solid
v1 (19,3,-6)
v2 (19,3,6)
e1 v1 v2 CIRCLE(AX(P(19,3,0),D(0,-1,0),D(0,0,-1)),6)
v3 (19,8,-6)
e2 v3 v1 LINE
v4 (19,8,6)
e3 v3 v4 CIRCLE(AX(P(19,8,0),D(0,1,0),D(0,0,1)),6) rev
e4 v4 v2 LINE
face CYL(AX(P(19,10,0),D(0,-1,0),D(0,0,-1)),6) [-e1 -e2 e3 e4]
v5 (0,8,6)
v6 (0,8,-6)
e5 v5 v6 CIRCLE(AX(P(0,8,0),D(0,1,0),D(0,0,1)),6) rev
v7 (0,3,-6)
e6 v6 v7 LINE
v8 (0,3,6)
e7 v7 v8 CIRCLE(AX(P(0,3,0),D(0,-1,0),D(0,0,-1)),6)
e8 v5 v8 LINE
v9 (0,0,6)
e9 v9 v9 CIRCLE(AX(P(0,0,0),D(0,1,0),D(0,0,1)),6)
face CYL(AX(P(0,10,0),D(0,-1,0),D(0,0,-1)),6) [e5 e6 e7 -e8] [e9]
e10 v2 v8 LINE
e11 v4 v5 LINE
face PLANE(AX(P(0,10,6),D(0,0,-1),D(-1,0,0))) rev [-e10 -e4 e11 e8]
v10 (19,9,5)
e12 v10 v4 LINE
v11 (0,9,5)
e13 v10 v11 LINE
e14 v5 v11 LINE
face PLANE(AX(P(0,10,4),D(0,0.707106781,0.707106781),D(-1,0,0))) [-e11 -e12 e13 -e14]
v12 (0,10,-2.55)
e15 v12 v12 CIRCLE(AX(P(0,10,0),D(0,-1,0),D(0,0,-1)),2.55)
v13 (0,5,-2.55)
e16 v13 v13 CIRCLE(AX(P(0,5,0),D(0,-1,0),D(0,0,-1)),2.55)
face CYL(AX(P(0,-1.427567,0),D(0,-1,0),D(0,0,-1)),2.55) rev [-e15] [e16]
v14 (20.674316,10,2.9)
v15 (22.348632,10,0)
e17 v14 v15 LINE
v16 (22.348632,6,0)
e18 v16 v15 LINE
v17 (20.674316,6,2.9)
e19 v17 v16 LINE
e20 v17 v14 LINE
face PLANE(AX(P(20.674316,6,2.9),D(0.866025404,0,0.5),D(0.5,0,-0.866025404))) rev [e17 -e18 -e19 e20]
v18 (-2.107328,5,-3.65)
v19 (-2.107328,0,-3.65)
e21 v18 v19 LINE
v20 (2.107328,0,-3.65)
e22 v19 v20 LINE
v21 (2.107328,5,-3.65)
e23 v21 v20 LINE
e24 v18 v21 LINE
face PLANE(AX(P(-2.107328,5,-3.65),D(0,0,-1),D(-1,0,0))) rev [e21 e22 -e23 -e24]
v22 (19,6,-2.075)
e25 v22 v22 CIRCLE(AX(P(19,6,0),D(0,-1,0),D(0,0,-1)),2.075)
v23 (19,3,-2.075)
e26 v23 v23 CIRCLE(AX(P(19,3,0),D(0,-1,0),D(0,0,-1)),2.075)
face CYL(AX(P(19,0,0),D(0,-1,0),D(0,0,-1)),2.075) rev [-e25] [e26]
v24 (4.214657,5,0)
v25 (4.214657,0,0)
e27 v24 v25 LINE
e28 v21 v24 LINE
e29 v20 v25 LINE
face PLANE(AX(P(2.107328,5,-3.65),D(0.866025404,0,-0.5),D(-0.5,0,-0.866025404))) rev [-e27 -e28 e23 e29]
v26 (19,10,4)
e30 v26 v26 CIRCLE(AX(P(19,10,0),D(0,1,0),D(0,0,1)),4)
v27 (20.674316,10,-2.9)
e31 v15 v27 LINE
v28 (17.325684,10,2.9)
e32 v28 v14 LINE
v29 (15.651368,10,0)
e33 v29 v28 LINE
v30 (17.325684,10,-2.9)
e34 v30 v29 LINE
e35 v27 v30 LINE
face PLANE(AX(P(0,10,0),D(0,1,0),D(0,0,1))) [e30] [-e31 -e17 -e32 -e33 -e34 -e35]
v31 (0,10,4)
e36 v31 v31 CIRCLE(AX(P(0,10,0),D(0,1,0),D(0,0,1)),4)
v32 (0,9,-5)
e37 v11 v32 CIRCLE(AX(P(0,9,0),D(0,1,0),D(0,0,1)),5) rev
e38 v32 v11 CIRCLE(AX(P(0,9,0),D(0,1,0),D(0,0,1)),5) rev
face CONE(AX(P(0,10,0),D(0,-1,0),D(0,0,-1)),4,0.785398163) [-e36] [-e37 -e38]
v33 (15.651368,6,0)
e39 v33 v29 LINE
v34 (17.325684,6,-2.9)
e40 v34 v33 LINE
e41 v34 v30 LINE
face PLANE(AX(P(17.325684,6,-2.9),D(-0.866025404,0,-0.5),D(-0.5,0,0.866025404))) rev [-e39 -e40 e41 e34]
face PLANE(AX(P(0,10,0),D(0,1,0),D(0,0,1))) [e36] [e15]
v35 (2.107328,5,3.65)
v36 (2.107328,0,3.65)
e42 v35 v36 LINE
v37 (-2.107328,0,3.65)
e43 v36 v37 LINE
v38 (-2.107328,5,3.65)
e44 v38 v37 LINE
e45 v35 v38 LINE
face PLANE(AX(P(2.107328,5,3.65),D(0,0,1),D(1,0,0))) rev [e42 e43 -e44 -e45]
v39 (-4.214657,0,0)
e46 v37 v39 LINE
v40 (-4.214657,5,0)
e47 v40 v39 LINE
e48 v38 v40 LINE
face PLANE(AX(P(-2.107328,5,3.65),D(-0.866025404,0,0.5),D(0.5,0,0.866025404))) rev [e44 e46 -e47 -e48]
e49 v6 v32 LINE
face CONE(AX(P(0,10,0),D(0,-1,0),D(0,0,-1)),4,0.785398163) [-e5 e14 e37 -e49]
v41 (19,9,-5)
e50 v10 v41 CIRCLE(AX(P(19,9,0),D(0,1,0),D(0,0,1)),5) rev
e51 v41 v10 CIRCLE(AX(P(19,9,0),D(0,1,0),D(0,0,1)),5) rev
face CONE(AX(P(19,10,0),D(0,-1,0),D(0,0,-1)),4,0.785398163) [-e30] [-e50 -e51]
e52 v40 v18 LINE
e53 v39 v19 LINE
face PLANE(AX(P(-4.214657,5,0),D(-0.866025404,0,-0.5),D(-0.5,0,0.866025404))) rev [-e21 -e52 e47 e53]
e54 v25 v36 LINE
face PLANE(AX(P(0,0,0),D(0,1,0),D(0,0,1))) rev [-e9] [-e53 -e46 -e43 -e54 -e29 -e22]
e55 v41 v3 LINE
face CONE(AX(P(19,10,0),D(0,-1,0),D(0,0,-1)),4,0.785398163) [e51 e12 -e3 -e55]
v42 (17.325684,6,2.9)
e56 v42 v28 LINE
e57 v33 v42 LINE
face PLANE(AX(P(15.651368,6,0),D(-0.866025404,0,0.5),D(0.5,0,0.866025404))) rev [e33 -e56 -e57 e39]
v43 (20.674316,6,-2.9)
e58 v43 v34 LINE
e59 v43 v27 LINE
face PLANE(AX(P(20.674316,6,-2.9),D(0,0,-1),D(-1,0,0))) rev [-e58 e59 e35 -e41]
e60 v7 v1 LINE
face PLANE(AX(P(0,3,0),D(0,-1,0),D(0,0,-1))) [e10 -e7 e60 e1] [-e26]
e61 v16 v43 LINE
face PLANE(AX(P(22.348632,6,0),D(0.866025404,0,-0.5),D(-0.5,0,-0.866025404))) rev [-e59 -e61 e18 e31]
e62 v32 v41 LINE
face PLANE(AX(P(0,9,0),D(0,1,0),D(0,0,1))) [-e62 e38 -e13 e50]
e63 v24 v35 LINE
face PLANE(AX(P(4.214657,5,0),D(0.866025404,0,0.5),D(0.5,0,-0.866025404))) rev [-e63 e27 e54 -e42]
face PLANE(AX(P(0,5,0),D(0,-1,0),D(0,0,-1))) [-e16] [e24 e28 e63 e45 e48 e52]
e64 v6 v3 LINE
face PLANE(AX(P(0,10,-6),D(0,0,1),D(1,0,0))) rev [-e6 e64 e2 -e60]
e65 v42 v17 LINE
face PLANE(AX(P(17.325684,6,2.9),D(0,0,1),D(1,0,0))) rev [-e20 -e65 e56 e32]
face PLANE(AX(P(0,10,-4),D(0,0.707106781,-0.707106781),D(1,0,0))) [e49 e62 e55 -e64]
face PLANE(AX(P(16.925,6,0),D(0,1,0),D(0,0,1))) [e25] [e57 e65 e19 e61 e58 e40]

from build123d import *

# Parameters (mm, degrees)
EXTRUDE_1_DEPTH     = 10
CHAMFER_1_SIZE      = 2
CUT_EXTRUDE_1_DEPTH = 5
SKETCH_5_R          = 32.43595028
SKETCH_5_R_2        = 6
CUT_EXTRUDE_2_DEPTH = 3
CUT_EXTRUDE_3_DEPTH = 4
SKETCH_7_W          = 54.061660739
SKETCH_7_H          = 47.527586942
SKETCH_7_R          = 4
CUT_EXTRUDE_4_DEPTH = 1
CHAMFER_2_SIZE      = 1


with BuildPart() as part:
    # 草图1 → 凸台-拉伸1 (new body)
    with BuildSketch(Plane(origin=(0, 0, 0), x_dir=(1, 0, 0), z_dir=(0, 1, 0))):
        with BuildLine():
            Line((0, 6), (19, 6))
            ThreePointArc((19, 6), (25, 0), (19, -6))
            Line((19, -6), (0, -6))
            ThreePointArc((0, -6), (-6, 0), (0, 6))
        make_face()
    extrude(amount=EXTRUDE_1_DEPTH)

    # 草图2 → 切除-旋转1 (revolve, cut)
    with BuildSketch(Plane.XY, mode=Mode.PRIVATE) as cut_revolve_1_sk:
        Polygon((0, 10), (-2.55, 10), (-2.55, 5), (-1.6, 5), (-1.6, 2), (-2.55, 2), (-2.55, 0), (0, 0), align=None)
    revolve(cut_revolve_1_sk.sketch.rotate(Axis((0, -1.427566958, 0), (0, 1, 0)), 270), axis=Axis((0, -1.427566958, 0), (0, 1, 0)), mode=Mode.SUBTRACT)

    # 草图3 → 切除-旋转2 (revolve, cut)
    with BuildSketch(Plane.XY, mode=Mode.PRIVATE) as cut_revolve_2_sk:
        Polygon((19, 0), (16.925, 0), (16.925, 6), (16.5, 6), (16.5, 10), (19, 10), align=None)
    revolve(cut_revolve_2_sk.sketch.rotate(Axis((19, 0, 0), (0, 1, 0)), 270), axis=Axis((19, 0, 0), (0, 1, 0)), mode=Mode.SUBTRACT)

    # 倒角1
    chamfer_1_edges = [part.edges().sort_by_distance(p)[0] for p in [
        (25, 10, 0),
        (9.5, 10, -6),
        (-6, 10, 0),
        (9.5, 10, 6),
    ]]
    chamfer(chamfer_1_edges, length=CHAMFER_1_SIZE)

    # 草图4 → 切除-拉伸1 (cut)
    with BuildSketch(Plane.XZ):
        Polygon((2.107328483, 3.65), (-2.107328483, 3.65), (-4.214656965, 0), (-2.107328483, -3.65), (2.107328483, -3.65), (4.214656965, 0), align=None)
    extrude(amount=-CUT_EXTRUDE_1_DEPTH, mode=Mode.SUBTRACT)

    # 草图5 → 切除-拉伸2 (cut)
    with BuildSketch(Plane.XZ):
        Circle(SKETCH_5_R)
        with Locations(Location((0, 0, 0), (0, 0, 90))):
            Circle(SKETCH_5_R_2, mode=Mode.SUBTRACT)
    extrude(amount=-CUT_EXTRUDE_2_DEPTH, mode=Mode.SUBTRACT)

    # 草图6 → 切除-拉伸3 (cut)
    with BuildSketch(Plane(origin=(0, 10, 0), x_dir=(1, 0, 0), z_dir=(0, 1, 0))):
        Polygon((20.674315781, 2.9), (17.325684219, 2.9), (15.651368439, 0), (17.325684219, -2.9), (20.674315781, -2.9), (22.348631561, 0), align=None)
    extrude(amount=-CUT_EXTRUDE_3_DEPTH, mode=Mode.SUBTRACT)

    # 草图7 → 切除-拉伸4 (cut)
    with BuildSketch(Plane(origin=(0, 10, 0), x_dir=(1, 0, 0), z_dir=(0, 1, 0))):
        with Locations((6.682015694, 1.141108586)):
            Rectangle(SKETCH_7_W, SKETCH_7_H)
        with Locations(Location((0, 0, 0), (0, 0, 270))):
            Circle(SKETCH_7_R, mode=Mode.SUBTRACT)
        with Locations(Location((19, 0, 0), (0, 0, 270))):
            Circle(SKETCH_7_R, mode=Mode.SUBTRACT)
    extrude(amount=-CUT_EXTRUDE_4_DEPTH, mode=Mode.SUBTRACT)

    # 倒角2
    chamfer_2_edges = [part.edges().sort_by_distance(p)[0] for p in [
        (19, 9, -4),
        (0, 9, -4),
    ]]
    chamfer(chamfer_2_edges, length=CHAMFER_2_SIZE - 0.0001)  # a hair under: the kernel refuses the full size


solid = part.part
